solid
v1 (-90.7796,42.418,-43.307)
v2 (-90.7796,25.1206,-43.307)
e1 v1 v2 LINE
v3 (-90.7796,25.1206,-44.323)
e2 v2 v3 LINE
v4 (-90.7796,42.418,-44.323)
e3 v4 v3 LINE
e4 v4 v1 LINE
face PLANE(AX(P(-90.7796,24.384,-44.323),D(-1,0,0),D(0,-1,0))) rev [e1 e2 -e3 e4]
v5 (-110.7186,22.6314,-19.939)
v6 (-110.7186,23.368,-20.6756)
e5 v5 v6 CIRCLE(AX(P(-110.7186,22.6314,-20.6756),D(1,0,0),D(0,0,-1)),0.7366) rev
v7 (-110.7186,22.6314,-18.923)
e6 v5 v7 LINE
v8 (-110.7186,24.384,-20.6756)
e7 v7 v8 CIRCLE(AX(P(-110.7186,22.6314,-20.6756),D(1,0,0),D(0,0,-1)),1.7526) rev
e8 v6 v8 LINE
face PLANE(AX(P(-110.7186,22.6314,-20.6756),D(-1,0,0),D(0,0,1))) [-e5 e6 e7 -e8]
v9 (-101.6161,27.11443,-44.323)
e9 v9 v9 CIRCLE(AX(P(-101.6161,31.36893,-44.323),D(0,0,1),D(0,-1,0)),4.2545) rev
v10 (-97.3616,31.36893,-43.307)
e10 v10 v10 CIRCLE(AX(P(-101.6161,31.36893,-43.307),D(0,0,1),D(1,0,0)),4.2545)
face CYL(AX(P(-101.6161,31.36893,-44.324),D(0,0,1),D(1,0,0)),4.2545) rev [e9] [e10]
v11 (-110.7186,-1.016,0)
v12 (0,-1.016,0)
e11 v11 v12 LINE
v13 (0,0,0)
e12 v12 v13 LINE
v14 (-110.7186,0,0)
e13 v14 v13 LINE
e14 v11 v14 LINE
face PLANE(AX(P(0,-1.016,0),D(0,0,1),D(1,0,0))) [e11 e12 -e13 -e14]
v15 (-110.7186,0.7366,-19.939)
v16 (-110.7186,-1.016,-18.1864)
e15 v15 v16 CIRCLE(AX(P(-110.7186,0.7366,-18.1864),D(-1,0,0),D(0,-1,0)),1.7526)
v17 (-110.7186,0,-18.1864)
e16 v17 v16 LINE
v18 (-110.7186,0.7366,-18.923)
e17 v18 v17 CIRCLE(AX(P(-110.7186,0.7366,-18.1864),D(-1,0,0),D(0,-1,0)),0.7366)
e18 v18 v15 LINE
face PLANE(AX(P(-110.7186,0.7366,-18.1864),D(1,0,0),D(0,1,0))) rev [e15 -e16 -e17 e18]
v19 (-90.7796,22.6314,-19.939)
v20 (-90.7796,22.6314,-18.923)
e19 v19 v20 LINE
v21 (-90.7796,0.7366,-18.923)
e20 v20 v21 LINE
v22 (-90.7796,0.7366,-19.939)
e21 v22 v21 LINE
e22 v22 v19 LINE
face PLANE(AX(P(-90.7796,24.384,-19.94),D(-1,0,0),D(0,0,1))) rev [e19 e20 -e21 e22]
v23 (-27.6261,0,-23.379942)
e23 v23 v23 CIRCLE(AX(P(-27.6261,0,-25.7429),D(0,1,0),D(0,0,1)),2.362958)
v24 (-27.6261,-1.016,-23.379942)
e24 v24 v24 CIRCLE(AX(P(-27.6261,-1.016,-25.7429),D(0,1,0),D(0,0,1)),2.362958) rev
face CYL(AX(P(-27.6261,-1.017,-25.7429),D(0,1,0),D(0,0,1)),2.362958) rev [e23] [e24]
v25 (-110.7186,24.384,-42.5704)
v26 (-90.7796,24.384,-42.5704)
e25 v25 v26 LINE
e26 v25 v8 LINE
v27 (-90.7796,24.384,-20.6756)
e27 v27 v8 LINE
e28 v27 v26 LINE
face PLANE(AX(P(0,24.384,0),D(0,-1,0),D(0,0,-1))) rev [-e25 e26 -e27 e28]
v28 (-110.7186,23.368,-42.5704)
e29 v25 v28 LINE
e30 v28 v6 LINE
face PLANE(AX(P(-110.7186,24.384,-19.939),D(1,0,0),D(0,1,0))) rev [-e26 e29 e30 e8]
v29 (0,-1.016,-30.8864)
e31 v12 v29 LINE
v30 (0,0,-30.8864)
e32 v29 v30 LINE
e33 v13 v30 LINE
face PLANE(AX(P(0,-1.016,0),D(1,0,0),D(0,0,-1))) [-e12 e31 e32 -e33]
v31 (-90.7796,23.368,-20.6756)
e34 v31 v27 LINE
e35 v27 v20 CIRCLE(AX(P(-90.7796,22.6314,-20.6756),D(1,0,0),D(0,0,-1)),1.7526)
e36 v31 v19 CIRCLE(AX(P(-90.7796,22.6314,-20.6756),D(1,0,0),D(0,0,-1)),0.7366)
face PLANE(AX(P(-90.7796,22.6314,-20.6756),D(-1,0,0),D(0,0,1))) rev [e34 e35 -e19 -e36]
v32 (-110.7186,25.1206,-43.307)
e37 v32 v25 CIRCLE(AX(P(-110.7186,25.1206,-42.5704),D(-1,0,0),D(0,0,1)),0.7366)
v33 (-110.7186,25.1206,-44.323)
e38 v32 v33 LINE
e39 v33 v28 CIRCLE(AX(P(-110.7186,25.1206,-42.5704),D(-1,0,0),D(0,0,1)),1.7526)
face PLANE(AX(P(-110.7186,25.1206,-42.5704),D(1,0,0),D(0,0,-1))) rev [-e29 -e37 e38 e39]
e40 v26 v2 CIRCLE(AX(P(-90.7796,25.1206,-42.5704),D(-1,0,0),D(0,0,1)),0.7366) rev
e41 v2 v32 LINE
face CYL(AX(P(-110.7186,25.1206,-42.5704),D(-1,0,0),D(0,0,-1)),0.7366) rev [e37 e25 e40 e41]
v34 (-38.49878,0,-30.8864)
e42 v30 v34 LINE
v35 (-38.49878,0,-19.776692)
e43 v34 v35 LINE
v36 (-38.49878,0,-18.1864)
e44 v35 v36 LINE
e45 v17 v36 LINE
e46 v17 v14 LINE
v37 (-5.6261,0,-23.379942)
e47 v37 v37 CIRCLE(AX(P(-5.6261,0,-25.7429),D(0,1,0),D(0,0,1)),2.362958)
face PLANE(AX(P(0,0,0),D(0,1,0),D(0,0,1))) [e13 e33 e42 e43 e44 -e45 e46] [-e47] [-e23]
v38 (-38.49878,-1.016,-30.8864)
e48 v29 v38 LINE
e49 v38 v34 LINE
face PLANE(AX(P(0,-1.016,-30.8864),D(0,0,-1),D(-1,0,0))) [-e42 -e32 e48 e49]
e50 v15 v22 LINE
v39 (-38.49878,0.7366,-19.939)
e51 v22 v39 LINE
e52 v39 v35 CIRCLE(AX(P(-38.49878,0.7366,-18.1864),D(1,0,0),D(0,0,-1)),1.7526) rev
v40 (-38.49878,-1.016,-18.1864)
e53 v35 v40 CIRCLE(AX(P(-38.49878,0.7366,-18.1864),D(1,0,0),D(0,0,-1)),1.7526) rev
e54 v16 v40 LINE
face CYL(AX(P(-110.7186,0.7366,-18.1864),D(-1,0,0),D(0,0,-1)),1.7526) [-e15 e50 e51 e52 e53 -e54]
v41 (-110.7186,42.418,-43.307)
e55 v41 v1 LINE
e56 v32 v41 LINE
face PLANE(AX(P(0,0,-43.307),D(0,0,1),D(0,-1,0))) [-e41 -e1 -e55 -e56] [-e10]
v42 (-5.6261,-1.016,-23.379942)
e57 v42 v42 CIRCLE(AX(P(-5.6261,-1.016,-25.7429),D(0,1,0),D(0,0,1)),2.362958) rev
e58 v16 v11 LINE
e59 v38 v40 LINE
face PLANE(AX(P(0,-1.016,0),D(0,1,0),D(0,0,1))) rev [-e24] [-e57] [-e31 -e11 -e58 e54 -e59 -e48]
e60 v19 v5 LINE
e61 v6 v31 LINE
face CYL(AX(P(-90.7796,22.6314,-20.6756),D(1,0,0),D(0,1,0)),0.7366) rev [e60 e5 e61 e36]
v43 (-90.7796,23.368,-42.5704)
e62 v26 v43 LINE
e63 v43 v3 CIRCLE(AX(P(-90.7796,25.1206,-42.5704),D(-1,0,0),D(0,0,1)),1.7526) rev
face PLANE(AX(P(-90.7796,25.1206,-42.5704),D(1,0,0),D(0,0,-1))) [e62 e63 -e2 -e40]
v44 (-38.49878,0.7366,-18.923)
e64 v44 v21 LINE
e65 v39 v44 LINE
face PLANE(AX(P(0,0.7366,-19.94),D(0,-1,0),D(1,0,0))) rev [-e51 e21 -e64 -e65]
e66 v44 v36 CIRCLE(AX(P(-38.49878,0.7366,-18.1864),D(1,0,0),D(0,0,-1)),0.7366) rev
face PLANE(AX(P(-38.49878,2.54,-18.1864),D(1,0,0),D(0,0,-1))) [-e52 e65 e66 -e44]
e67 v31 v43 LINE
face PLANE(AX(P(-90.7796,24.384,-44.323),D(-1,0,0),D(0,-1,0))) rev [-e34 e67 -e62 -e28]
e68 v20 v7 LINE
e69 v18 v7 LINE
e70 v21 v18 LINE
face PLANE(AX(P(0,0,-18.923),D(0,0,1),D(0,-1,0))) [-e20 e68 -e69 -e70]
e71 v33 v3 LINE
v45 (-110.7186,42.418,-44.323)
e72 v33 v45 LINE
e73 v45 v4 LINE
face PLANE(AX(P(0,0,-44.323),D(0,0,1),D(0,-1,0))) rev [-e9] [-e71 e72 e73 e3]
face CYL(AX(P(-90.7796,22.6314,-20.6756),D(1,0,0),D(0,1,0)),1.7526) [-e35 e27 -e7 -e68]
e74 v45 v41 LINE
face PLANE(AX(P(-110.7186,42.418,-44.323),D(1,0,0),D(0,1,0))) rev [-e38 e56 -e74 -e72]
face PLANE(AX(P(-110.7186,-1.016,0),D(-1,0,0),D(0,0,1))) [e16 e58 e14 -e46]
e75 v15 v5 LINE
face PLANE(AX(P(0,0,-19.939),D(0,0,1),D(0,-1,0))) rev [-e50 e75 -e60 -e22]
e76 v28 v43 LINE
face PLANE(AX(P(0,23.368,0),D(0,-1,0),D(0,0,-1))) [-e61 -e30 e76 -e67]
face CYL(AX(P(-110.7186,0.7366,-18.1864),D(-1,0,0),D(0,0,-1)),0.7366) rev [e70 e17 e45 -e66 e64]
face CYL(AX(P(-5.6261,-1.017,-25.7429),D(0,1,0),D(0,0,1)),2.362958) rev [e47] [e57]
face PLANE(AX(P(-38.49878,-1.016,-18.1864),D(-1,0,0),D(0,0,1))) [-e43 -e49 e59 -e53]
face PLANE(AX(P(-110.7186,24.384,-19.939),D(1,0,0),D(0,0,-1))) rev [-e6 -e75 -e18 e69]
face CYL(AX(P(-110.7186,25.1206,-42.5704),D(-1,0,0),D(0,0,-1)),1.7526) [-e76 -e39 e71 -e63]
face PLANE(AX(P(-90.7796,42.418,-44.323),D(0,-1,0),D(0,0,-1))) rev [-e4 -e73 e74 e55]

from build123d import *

# Parameters (mm, degrees)
SKETCH1_W                    = 110.7186
SKETCH1_H                    = 19.939
BASE_FLANGE1_DEPTH           = 1.016
EDGE_FLANGE1_STRIP_W         = 5.5372
EDGE_FLANGE1_STRIP_H         = 1.016
EDGE_FLANGE1_STRIP_CUT_DEPTH = 110.7186
EDGE_FLANGE1_DEPTH           = 110.7186
CUT_EXTRUDE1_REACH           = 116.94
SKETCH9_W                    = 90.7796
SKETCH9_H                    = 23.6474
EDGE_FLANGE2_STRIP_W         = 5.5372
EDGE_FLANGE2_STRIP_H         = 1.016
EDGE_FLANGE2_STRIP_CUT_DEPTH = 19.939
EDGE_FLANGE2_DEPTH           = 19.939
EDGE_FLANGE3_STRIP_W         = 5.5372
EDGE_FLANGE3_STRIP_H         = 1.016
EDGE_FLANGE3_STRIP_CUT_DEPTH = 19.939
EDGE_FLANGE3_DEPTH           = 19.939
CUT_EXTRUDE2_DEPTH           = 2.54
CUT_EXTRUDE2_DEPTH_BACK      = 2.54
SKETCH17_W                   = 38.49878
SKETCH17_H                   = 1.7526
SKETCH16_W                   = 38.49878
SKETCH16_H                   = 12.7
TAB2_DEPTH                   = 1.016
CUT_EXTRUDE3_REACH           = 128.228
SKETCH20_R                   = 4.2545
CUT_EXTRUDE4_REACH           = 128.58
SKETCH21_R                   = 2.36295848


# Sheet-metal steps are written as plain solids
with BuildPart() as part:
    # Sketch1 → Base-Flange1 (new body)
    with BuildSketch(Plane(origin=(0, 0, 0), x_dir=(1, 0, 0), z_dir=(0, 1, 0))):
        with Locations((-55.3593, 9.9695)):
            Rectangle(SKETCH1_W, SKETCH1_H)
    extrude(amount=-BASE_FLANGE1_DEPTH)

    # Edge-Flange1 strip (across the edge) → Edge-Flange1 strip cut (cut)
    with BuildSketch(Plane(origin=(0, 0, -19.939), x_dir=(0, 0, 1), z_dir=(-1, 0, 0))):
        with Locations((-1.016, -0.508)):
            Rectangle(EDGE_FLANGE1_STRIP_W, EDGE_FLANGE1_STRIP_H)
    extrude(amount=EDGE_FLANGE1_STRIP_CUT_DEPTH, mode=Mode.SUBTRACT)

    # Edge-Flange1 section (across the edge) → Edge-Flange1 (add)
    with BuildSketch(Plane(origin=(0, 0, -19.939), x_dir=(0, 0, 1), z_dir=(-1, 0, 0))):
        with BuildLine():
            Line((0, 0.7366), (0, 24.384))
            Line((0, 24.384), (1.016, 24.384))
            Line((1.016, 24.384), (1.016, 0.7366))
            ThreePointArc((1.016, 0.7366), (1.231745145, 0.215745145), (1.7526, 0))
            Line((1.7526, 0), (1.7526, -1.016))
            ThreePointArc((1.7526, -1.016), (0.513324655, -0.502675345), (0, 0.7366))
        make_face()
    extrude(amount=EDGE_FLANGE1_DEPTH)

    # Sketch9 → Cut-Extrude1 (cut, up to next)
    with BuildSketch(Plane.XY.offset(-18.923), mode=Mode.PRIVATE) as cut_extrude1_sk1:
        with Locations((-45.3898, 12.5603)):
            Rectangle(SKETCH9_W, SKETCH9_H)
    cut_extrude1_tool1 = extrude(cut_extrude1_sk1.sketch, amount=-CUT_EXTRUDE1_REACH, mode=Mode.PRIVATE) & part.part
    add(cut_extrude1_tool1.solids().sort_by_distance((-45.3898, 12.5603, -18.923))[0], mode=Mode.SUBTRACT)

    # Edge-Flange2 strip (across the edge) → Edge-Flange2 strip cut (cut)
    with BuildSketch(Plane(origin=(-110.7186, 24.384, -19.939), x_dir=(0, -1, 0), z_dir=(1, 0, 0))):
        with Locations((-1.016, -0.508)):
            Rectangle(EDGE_FLANGE2_STRIP_W, EDGE_FLANGE2_STRIP_H)
    extrude(amount=EDGE_FLANGE2_STRIP_CUT_DEPTH, mode=Mode.SUBTRACT)

    # Edge-Flange2 section (across the edge) → Edge-Flange2 (add)
    with BuildSketch(Plane(origin=(-110.7186, 24.384, -19.939), x_dir=(0, -1, 0), z_dir=(1, 0, 0))):
        with BuildLine():
            Line((0, 0.7366), (0, 24.384))
            Line((0, 24.384), (1.016, 24.384))
            Line((1.016, 24.384), (1.016, 0.7366))
            ThreePointArc((1.016, 0.7366), (1.231745145, 0.215745145), (1.7526, 0))
            Line((1.7526, 0), (1.7526, -1.016))
            ThreePointArc((1.7526, -1.016), (0.513324655, -0.502675345), (0, 0.7366))
        make_face()
    extrude(amount=EDGE_FLANGE2_DEPTH)

    # Edge-Flange3 strip (across the edge) → Edge-Flange3 strip cut (cut)
    with BuildSketch(Plane(origin=(-90.7796, 24.384, -44.323), x_dir=(0, 0, 1), z_dir=(-1, 0, 0))):
        with Locations((-1.016, -0.508)):
            Rectangle(EDGE_FLANGE3_STRIP_W, EDGE_FLANGE3_STRIP_H)
    extrude(amount=EDGE_FLANGE3_STRIP_CUT_DEPTH, mode=Mode.SUBTRACT)

    # Edge-Flange3 section (across the edge) → Edge-Flange3 (add)
    with BuildSketch(Plane(origin=(-90.7796, 24.384, -44.323), x_dir=(0, 0, 1), z_dir=(-1, 0, 0))):
        with BuildLine():
            Line((0, 0.7366), (0, 18.034))
            Line((0, 18.034), (1.016, 18.034))
            Line((1.016, 18.034), (1.016, 0.7366))
            ThreePointArc((1.016, 0.7366), (1.231745145, 0.215745145), (1.7526, 0))
            Line((1.7526, 0), (1.7526, -1.016))
            ThreePointArc((1.7526, -1.016), (0.513324655, -0.502675345), (0, 0.7366))
        make_face()
    extrude(amount=EDGE_FLANGE3_DEPTH)

    # Sketch17 → Cut-Extrude2 (cut, two sides: drawn at the far end of the back side and taken through both)
    with BuildSketch(Plane(origin=(0, 0, 0), x_dir=(1, 0, 0), z_dir=(0, 1, 0)).offset(-CUT_EXTRUDE2_DEPTH_BACK)):
        with Locations((-19.24939, 19.0627)):
            Rectangle(SKETCH17_W, SKETCH17_H)
    extrude(amount=CUT_EXTRUDE2_DEPTH + CUT_EXTRUDE2_DEPTH_BACK, mode=Mode.SUBTRACT)

    # Sketch16 → Tab2 (add)
    with BuildSketch(Plane(origin=(0, 0, 0), x_dir=(1, 0, 0), z_dir=(0, 1, 0))):
        with Locations((-19.24939, 24.5364)):
            Rectangle(SKETCH16_W, SKETCH16_H)
    extrude(amount=-TAB2_DEPTH)

    # Sketch20 → Cut-Extrude3 (cut, up to next)
    with BuildSketch(Plane.XY.offset(-43.307), mode=Mode.PRIVATE) as cut_extrude3_sk1:
        with Locations((-101.6161, 31.368930224)):
            Circle(SKETCH20_R)
    cut_extrude3_tool1 = extrude(cut_extrude3_sk1.sketch, amount=-CUT_EXTRUDE3_REACH, mode=Mode.PRIVATE) & part.part
    add(cut_extrude3_tool1.solids().sort_by_distance((-101.6161, 31.36893, -43.307))[0], mode=Mode.SUBTRACT)

    # Sketch21 → Cut-Extrude4 (cut, up to next)
    with BuildSketch(Plane(origin=(0, 0, 0), x_dir=(1, 0, 0), z_dir=(0, 1, 0)), mode=Mode.PRIVATE) as cut_extrude4_sk1:
        with Locations(Location((-27.6261, 25.7429, 0), (0, 0, 270))):
            Circle(SKETCH21_R)
    cut_extrude4_tool1 = extrude(cut_extrude4_sk1.sketch, amount=-CUT_EXTRUDE4_REACH, mode=Mode.PRIVATE) & part.part
    # Sketch21 → Cut-Extrude4 (cut, up to next)
    with BuildSketch(Plane(origin=(0, 0, 0), x_dir=(1, 0, 0), z_dir=(0, 1, 0)), mode=Mode.PRIVATE) as cut_extrude4_sk2:
        with Locations(Location((-5.6261, 25.7429, 0), (0, 0, 270))):
            Circle(SKETCH21_R)
    cut_extrude4_tool2 = extrude(cut_extrude4_sk2.sketch, amount=-CUT_EXTRUDE4_REACH, mode=Mode.PRIVATE) & part.part
    add(cut_extrude4_tool1.solids().sort_by_distance((-27.6261, 0, -25.7429))[0], mode=Mode.SUBTRACT)
    add(cut_extrude4_tool2.solids().sort_by_distance((-5.6261, 0, -25.7429))[0], mode=Mode.SUBTRACT)


solid = part.part
